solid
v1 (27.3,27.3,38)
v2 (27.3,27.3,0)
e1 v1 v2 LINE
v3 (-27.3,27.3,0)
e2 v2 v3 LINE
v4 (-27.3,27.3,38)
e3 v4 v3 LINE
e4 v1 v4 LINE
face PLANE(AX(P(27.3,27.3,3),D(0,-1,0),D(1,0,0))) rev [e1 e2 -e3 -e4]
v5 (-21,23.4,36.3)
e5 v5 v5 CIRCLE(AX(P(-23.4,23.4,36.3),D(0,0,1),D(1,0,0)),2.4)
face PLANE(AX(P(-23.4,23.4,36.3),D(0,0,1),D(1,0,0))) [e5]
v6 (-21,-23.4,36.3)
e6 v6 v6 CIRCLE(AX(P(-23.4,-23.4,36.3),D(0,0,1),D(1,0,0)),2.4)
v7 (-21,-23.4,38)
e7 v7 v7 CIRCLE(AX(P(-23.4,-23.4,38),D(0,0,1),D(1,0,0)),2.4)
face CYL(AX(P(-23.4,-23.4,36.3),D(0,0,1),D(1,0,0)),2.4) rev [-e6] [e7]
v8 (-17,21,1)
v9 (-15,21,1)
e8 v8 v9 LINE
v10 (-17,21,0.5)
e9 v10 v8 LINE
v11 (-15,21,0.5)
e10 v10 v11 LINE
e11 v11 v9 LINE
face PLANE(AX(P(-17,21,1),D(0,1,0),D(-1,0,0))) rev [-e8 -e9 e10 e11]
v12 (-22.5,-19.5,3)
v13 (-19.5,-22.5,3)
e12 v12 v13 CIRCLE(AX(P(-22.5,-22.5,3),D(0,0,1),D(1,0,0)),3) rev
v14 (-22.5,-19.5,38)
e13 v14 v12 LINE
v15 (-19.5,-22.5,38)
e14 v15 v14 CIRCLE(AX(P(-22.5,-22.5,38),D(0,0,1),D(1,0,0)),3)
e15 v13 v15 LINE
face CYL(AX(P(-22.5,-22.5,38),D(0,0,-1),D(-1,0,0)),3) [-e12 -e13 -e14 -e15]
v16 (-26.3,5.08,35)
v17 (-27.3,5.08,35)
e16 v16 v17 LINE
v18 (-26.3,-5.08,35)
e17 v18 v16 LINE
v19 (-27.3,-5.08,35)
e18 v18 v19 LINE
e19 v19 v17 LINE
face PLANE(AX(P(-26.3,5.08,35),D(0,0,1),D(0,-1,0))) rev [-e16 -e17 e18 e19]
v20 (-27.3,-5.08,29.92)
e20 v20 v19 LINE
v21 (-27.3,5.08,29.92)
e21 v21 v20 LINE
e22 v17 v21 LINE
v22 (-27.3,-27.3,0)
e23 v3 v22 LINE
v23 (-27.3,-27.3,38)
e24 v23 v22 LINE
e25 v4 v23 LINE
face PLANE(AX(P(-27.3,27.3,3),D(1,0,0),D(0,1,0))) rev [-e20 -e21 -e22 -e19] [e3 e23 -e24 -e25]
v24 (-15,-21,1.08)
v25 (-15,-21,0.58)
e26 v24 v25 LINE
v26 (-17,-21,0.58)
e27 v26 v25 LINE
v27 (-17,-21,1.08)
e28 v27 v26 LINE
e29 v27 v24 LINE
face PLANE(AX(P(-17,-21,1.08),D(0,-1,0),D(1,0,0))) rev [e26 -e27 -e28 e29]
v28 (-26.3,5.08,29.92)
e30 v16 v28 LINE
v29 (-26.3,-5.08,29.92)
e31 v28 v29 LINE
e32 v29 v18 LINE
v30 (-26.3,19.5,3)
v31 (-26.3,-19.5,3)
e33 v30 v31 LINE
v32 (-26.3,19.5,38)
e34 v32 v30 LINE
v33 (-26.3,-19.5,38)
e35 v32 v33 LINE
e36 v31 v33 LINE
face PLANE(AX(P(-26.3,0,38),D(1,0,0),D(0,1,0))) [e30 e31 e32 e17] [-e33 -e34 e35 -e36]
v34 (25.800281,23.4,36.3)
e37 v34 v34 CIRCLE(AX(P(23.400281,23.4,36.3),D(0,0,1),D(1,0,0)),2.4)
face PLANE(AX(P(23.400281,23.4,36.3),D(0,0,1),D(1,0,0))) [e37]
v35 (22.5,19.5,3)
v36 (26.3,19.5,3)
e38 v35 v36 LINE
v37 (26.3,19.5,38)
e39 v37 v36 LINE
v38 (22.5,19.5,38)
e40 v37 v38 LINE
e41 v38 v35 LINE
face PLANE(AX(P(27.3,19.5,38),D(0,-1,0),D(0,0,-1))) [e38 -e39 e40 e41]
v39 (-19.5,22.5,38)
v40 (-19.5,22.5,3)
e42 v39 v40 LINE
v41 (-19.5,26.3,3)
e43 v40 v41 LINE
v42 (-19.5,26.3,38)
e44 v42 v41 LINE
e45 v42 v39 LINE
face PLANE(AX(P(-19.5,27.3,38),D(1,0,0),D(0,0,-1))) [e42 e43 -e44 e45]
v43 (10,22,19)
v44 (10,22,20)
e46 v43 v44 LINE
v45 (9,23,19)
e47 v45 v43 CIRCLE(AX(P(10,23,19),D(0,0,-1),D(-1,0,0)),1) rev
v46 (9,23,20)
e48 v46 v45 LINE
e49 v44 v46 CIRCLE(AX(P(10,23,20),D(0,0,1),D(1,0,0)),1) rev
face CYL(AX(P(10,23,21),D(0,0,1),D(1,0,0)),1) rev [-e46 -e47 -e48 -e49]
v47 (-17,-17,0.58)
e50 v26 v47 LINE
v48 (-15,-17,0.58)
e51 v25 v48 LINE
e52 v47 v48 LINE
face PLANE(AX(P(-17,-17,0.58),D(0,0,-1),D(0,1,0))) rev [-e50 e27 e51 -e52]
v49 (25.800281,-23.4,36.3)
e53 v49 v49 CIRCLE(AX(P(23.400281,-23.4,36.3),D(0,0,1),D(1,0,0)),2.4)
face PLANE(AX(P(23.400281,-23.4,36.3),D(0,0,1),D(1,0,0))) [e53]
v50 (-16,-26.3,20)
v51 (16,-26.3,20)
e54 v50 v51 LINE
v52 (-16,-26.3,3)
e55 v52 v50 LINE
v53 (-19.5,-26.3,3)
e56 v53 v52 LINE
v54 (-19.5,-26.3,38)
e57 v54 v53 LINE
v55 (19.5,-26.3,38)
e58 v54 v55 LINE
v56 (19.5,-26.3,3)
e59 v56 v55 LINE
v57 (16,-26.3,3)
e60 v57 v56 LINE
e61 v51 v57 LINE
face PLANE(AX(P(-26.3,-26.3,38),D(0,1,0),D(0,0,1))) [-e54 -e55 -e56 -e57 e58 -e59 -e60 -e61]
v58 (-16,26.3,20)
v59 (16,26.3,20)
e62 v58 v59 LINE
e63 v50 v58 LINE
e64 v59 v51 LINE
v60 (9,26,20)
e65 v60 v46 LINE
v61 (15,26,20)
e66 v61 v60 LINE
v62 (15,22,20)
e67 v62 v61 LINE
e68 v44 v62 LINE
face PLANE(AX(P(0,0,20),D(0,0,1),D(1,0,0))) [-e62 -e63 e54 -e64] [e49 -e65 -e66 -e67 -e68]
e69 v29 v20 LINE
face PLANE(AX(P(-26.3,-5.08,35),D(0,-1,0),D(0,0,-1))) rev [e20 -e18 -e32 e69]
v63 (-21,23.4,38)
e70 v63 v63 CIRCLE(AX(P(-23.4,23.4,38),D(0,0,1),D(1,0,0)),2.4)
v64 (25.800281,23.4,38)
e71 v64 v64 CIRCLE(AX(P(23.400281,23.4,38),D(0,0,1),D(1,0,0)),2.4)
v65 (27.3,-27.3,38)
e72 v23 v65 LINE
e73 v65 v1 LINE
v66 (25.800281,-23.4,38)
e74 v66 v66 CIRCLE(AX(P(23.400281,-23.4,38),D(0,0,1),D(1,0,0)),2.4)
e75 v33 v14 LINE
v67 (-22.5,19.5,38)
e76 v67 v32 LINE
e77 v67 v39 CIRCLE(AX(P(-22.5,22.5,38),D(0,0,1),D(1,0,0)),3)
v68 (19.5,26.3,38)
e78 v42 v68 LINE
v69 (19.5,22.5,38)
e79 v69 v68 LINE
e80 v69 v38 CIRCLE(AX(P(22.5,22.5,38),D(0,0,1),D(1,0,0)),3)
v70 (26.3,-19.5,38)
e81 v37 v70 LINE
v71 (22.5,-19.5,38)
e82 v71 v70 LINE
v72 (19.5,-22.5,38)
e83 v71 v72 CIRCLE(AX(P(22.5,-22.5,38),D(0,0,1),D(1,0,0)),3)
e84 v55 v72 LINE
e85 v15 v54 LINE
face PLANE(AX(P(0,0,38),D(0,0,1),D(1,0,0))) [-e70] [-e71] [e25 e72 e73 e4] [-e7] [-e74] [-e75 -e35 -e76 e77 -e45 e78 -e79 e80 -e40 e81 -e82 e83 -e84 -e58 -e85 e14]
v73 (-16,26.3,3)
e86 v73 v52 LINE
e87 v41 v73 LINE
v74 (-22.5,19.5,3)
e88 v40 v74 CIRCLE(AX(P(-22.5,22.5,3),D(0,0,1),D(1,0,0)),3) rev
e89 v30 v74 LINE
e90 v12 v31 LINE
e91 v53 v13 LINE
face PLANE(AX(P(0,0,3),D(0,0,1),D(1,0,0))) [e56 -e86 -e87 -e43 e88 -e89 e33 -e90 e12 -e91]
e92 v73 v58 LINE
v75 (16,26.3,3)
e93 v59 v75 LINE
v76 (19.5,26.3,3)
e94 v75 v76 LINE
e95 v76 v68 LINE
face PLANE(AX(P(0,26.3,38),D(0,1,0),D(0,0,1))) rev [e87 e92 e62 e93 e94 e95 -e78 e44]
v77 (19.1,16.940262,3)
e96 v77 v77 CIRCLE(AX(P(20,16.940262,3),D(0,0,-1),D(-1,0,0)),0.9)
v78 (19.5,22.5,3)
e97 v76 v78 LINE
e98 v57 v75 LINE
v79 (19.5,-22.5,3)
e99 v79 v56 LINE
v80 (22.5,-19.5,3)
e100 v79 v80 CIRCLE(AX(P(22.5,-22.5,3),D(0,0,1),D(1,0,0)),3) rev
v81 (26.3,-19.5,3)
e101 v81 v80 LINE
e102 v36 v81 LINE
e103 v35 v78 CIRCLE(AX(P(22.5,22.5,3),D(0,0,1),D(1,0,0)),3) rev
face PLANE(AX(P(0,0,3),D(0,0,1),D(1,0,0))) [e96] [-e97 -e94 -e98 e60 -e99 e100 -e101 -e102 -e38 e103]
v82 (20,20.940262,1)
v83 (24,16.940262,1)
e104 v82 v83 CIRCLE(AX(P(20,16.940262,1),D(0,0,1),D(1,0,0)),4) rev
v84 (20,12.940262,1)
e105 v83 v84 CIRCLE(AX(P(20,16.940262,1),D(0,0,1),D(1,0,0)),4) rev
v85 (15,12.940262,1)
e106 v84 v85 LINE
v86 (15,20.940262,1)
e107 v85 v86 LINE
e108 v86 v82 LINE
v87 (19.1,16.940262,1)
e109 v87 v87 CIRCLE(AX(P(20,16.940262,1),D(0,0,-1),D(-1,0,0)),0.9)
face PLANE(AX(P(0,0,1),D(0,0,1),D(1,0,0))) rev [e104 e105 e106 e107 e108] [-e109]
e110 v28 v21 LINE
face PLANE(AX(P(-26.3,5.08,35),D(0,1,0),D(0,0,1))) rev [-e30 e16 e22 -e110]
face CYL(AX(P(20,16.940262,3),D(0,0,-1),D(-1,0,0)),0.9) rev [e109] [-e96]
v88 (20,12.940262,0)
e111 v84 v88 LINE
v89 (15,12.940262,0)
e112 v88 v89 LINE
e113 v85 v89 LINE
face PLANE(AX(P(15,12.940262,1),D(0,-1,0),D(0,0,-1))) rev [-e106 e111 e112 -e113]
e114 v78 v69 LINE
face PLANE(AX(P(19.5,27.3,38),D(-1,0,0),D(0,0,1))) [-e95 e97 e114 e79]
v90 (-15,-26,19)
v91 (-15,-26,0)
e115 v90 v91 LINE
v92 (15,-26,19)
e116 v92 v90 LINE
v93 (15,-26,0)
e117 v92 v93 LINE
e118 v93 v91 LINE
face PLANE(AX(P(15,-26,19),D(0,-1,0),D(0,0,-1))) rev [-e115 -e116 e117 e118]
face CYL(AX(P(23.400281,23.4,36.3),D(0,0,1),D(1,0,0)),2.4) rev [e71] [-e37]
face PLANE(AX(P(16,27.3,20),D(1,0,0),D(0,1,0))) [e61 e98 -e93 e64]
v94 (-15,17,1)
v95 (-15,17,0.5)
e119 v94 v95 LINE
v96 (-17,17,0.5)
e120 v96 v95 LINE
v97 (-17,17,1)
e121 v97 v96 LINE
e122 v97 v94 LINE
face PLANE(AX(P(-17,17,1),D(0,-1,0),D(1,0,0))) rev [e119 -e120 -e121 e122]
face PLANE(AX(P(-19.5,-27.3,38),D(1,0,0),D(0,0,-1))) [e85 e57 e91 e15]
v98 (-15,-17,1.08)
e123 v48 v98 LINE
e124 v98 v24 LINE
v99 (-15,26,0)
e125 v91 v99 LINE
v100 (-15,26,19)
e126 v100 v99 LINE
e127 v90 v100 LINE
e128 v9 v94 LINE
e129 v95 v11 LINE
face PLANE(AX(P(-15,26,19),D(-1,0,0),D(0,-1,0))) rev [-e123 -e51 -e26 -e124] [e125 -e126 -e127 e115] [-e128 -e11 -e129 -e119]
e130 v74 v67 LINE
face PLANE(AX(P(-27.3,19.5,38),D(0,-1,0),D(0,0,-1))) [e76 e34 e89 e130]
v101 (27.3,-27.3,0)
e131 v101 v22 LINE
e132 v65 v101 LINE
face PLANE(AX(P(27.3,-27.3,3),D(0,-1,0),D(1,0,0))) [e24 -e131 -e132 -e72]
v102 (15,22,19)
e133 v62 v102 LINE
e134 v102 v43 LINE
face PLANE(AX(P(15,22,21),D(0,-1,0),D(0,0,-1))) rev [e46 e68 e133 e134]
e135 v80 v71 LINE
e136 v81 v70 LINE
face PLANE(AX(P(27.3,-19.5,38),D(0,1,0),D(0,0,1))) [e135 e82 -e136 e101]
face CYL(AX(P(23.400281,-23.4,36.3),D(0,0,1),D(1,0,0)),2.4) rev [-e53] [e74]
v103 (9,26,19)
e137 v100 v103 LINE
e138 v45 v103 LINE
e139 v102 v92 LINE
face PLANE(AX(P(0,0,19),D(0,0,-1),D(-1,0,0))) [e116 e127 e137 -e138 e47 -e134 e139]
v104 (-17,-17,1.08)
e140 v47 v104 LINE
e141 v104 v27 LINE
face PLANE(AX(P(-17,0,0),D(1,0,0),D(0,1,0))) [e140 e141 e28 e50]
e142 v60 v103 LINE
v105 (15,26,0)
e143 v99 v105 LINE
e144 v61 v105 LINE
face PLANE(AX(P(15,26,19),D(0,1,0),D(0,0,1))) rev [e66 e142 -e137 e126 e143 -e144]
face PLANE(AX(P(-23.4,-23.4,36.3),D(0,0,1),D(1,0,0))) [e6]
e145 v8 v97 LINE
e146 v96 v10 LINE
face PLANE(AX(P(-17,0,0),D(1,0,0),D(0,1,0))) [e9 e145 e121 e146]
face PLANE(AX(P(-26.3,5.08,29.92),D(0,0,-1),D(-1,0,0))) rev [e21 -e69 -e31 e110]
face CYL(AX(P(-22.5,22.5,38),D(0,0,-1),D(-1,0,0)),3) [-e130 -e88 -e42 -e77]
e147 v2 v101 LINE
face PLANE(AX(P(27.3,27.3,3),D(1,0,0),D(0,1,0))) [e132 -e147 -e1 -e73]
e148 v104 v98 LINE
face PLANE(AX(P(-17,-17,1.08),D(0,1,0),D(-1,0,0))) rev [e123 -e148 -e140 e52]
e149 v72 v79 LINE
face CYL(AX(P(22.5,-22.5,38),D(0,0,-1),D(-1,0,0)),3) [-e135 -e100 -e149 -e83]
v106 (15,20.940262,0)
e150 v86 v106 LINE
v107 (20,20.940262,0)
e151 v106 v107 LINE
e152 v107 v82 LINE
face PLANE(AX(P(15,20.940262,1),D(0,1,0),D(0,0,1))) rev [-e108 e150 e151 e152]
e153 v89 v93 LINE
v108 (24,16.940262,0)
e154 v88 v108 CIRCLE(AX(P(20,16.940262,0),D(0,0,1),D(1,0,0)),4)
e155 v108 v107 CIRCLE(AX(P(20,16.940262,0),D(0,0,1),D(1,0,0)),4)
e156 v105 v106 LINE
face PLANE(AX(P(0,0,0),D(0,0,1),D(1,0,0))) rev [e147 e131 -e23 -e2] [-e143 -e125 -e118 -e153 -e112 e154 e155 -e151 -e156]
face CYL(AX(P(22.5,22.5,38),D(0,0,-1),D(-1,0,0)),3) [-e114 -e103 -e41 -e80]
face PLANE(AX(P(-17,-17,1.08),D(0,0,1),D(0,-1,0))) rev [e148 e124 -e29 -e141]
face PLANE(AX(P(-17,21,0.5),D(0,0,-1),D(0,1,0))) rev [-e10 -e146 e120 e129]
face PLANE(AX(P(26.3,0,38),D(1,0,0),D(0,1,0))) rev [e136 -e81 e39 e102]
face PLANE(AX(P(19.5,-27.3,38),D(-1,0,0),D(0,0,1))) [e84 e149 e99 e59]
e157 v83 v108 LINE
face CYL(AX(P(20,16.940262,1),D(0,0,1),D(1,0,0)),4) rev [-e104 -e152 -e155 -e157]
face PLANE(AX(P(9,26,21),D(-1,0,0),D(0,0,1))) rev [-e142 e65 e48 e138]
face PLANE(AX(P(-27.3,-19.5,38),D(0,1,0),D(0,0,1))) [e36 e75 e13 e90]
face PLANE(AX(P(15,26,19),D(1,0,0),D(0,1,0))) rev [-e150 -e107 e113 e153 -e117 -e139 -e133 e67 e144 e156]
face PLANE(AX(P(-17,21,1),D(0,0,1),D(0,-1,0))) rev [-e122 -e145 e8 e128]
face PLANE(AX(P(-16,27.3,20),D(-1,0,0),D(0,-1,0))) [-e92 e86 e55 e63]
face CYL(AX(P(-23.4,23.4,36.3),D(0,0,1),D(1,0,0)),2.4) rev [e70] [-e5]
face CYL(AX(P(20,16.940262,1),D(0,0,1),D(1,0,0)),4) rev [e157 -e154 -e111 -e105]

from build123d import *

# Parameters (mm, degrees)
SKICA1_W                  = 54.6
SKICA1_H                  = 54.6
P_IDAT_VYSUNUT_M2_DEPTH   = 3
SKICA14_W                 = 52.6
SKICA14_H                 = 1
P_IDAT_VYSUNUT_M9_DEPTH   = 35
SKICA19_W                 = 7.8
SKICA19_H                 = 7.8
P_IDAT_VYSUNUT_M10_DEPTH  = 38
SKICA20_R                 = 2.4
ODEBRAT_VYSUNUT_M9_DEPTH  = 1.7
ZAOBLIT1_R                = 3
SKICA25_W                 = 32
SKICA25_H                 = 54.6
P_IDAT_VYSUNUT_M12_DEPTH  = 20
SKICA26_W                 = 30
SKICA26_H                 = 52
ODEBRAT_VYSUNUT_M11_DEPTH = 19
SKICA27_W                 = 5.08
SKICA27_H                 = 10.16
ODEBRAT_VYSUNUT_M12_DEPTH = 1
SKICA28_W                 = 9
SKICA28_H                 = 8
ODEBRAT_VYSUNUT_M13_DEPTH = 1
ZAOBLIT3_R                = 4
SKICA29_W                 = 0.5
SKICA29_H                 = 4
ODEBRAT_VYSUNUT_M14_DEPTH = 2
SKICA30_R                 = 0.9
ODEBRAT_VYSUNUT_M15_DEPTH = 2
SKICA31_W                 = 6
SKICA31_H                 = 4
ODEBRAT_VYSUNUT_M16_DEPTH = 2
ZAOBLIT4_R                = 1


with BuildPart() as part:
    # Skica1 → Přidat vysunutím2 (new body)
    with BuildSketch(Plane.XY):
        Rectangle(SKICA1_W, SKICA1_H)
    extrude(amount=P_IDAT_VYSUNUT_M2_DEPTH)

    # Skica14 → Přidat vysunutím9 (add)
    with BuildSketch(Plane.XY.offset(3)):
        Polygon((27.3, 27.3), (-27.3, 27.3), (-27.3, -27.3), (-26.3, -27.3), (-26.3, -26.3), (-26.3, 26.3), (26.3, 26.3), (26.3, -26.3), (26.3, -27.3), (27.3, -27.3), align=None)
        with Locations((0, -26.8)):
            Rectangle(SKICA14_W, SKICA14_H)
    extrude(amount=P_IDAT_VYSUNUT_M9_DEPTH)

    # Skica19 → Přidat vysunutím10 (add)
    with BuildSketch(Plane(origin=(0, 0, 0), x_dir=(-1, 0, 0), z_dir=(0, 0, -1))):
        with Locations((-23.4, 23.4)):
            Rectangle(SKICA19_W, SKICA19_H)
        with Locations((23.4, 23.4)):
            Rectangle(SKICA19_W, SKICA19_H)
        with Locations((-23.4, -23.4)):
            Rectangle(SKICA19_W, SKICA19_H)
        with Locations((23.4, -23.4)):
            Rectangle(SKICA19_W, SKICA19_H)
    extrude(amount=-P_IDAT_VYSUNUT_M10_DEPTH)

    # Skica20 → Odebrat vysunutím9 (cut)
    with BuildSketch(Plane.XY.offset(38)):
        with Locations((-23.4, -23.4)):
            Circle(SKICA20_R)
        with Locations((-23.4, 23.4)):
            Circle(SKICA20_R)
        with Locations((23.400280565, 23.4)):
            Circle(SKICA20_R)
        with Locations((23.400280565, -23.4)):
            Circle(SKICA20_R)
    extrude(amount=-ODEBRAT_VYSUNUT_M9_DEPTH, mode=Mode.SUBTRACT)

    # Zaoblit1
    zaoblit1_edges = [part.edges().sort_by_distance(p)[0] for p in [
        (-19.5, -19.5, 20.5),
        (19.5, 19.5, 20.5),
        (-19.5, 19.5, 20.5),
        (19.5, -19.5, 20.5),
    ]]
    fillet(zaoblit1_edges, radius=ZAOBLIT1_R)

    # Skica25 → Přidat vysunutím12 (add)
    with BuildSketch(Plane(origin=(0, 0, 0), x_dir=(-1, 0, 0), z_dir=(0, 0, -1))):
        Rectangle(SKICA25_W, SKICA25_H)
    extrude(amount=-P_IDAT_VYSUNUT_M12_DEPTH)

    # Skica26 → Odebrat vysunutím11 (cut)
    with BuildSketch(Plane(origin=(0, 0, 0), x_dir=(-1, 0, 0), z_dir=(0, 0, -1))):
        Rectangle(SKICA26_W, SKICA26_H)
    extrude(amount=-ODEBRAT_VYSUNUT_M11_DEPTH, mode=Mode.SUBTRACT)

    # Skica27 → Odebrat vysunutím12 (cut)
    with BuildSketch(Plane.ZY.offset(27.3)):
        with Locations((32.46, 0)):
            Rectangle(SKICA27_W, SKICA27_H)
    extrude(amount=-ODEBRAT_VYSUNUT_M12_DEPTH, mode=Mode.SUBTRACT)

    # Skica28 → Odebrat vysunutím13 (cut)
    with BuildSketch(Plane(origin=(0, 0, 0), x_dir=(-1, 0, 0), z_dir=(0, 0, -1))):
        with Locations((-19.5, 16.940262317)):
            Rectangle(SKICA28_W, SKICA28_H)
    extrude(amount=-ODEBRAT_VYSUNUT_M13_DEPTH, mode=Mode.SUBTRACT)

    # Zaoblit3
    zaoblit3_edges = [part.edges().sort_by_distance(p)[0] for p in [
        (24, 12.940262317, 0.5),
        (24, 20.940262317, 0.5),
    ]]
    fillet(zaoblit3_edges, radius=ZAOBLIT3_R - 0.0001)  # a hair under: the kernel refuses the full size

    # Skica29 → Odebrat vysunutím14 (cut)
    with BuildSketch(Plane(origin=(-15, 0, 0), x_dir=(0, 0, -1), z_dir=(1, 0, 0))):
        with Locations((-0.75, 19)):
            Rectangle(SKICA29_W, SKICA29_H)
        with Locations((-0.83, -19)):
            Rectangle(SKICA29_W, SKICA29_H)
    extrude(amount=-ODEBRAT_VYSUNUT_M14_DEPTH, mode=Mode.SUBTRACT)

    # Skica30 → Odebrat vysunutím15 (cut)
    with BuildSketch(Plane(origin=(0, 0, 1), x_dir=(-1, 0, 0), z_dir=(0, 0, -1))):
        with Locations((-20, 16.940262317)):
            Circle(SKICA30_R)
    extrude(amount=-ODEBRAT_VYSUNUT_M15_DEPTH, mode=Mode.SUBTRACT)

    # Skica31 → Odebrat vysunutím16 (cut)
    with BuildSketch(Plane(origin=(0, 0, 19), x_dir=(-1, 0, 0), z_dir=(0, 0, -1))):
        with Locations((-12, 24)):
            Rectangle(SKICA31_W, SKICA31_H)
    extrude(amount=-ODEBRAT_VYSUNUT_M16_DEPTH, mode=Mode.SUBTRACT)

    # Zaoblit4
    zaoblit4_edges = [part.edges().sort_by_distance(p)[0] for p in [
        (9, 22, 19.5),
    ]]
    fillet(zaoblit4_edges, radius=ZAOBLIT4_R)


solid = part.part
